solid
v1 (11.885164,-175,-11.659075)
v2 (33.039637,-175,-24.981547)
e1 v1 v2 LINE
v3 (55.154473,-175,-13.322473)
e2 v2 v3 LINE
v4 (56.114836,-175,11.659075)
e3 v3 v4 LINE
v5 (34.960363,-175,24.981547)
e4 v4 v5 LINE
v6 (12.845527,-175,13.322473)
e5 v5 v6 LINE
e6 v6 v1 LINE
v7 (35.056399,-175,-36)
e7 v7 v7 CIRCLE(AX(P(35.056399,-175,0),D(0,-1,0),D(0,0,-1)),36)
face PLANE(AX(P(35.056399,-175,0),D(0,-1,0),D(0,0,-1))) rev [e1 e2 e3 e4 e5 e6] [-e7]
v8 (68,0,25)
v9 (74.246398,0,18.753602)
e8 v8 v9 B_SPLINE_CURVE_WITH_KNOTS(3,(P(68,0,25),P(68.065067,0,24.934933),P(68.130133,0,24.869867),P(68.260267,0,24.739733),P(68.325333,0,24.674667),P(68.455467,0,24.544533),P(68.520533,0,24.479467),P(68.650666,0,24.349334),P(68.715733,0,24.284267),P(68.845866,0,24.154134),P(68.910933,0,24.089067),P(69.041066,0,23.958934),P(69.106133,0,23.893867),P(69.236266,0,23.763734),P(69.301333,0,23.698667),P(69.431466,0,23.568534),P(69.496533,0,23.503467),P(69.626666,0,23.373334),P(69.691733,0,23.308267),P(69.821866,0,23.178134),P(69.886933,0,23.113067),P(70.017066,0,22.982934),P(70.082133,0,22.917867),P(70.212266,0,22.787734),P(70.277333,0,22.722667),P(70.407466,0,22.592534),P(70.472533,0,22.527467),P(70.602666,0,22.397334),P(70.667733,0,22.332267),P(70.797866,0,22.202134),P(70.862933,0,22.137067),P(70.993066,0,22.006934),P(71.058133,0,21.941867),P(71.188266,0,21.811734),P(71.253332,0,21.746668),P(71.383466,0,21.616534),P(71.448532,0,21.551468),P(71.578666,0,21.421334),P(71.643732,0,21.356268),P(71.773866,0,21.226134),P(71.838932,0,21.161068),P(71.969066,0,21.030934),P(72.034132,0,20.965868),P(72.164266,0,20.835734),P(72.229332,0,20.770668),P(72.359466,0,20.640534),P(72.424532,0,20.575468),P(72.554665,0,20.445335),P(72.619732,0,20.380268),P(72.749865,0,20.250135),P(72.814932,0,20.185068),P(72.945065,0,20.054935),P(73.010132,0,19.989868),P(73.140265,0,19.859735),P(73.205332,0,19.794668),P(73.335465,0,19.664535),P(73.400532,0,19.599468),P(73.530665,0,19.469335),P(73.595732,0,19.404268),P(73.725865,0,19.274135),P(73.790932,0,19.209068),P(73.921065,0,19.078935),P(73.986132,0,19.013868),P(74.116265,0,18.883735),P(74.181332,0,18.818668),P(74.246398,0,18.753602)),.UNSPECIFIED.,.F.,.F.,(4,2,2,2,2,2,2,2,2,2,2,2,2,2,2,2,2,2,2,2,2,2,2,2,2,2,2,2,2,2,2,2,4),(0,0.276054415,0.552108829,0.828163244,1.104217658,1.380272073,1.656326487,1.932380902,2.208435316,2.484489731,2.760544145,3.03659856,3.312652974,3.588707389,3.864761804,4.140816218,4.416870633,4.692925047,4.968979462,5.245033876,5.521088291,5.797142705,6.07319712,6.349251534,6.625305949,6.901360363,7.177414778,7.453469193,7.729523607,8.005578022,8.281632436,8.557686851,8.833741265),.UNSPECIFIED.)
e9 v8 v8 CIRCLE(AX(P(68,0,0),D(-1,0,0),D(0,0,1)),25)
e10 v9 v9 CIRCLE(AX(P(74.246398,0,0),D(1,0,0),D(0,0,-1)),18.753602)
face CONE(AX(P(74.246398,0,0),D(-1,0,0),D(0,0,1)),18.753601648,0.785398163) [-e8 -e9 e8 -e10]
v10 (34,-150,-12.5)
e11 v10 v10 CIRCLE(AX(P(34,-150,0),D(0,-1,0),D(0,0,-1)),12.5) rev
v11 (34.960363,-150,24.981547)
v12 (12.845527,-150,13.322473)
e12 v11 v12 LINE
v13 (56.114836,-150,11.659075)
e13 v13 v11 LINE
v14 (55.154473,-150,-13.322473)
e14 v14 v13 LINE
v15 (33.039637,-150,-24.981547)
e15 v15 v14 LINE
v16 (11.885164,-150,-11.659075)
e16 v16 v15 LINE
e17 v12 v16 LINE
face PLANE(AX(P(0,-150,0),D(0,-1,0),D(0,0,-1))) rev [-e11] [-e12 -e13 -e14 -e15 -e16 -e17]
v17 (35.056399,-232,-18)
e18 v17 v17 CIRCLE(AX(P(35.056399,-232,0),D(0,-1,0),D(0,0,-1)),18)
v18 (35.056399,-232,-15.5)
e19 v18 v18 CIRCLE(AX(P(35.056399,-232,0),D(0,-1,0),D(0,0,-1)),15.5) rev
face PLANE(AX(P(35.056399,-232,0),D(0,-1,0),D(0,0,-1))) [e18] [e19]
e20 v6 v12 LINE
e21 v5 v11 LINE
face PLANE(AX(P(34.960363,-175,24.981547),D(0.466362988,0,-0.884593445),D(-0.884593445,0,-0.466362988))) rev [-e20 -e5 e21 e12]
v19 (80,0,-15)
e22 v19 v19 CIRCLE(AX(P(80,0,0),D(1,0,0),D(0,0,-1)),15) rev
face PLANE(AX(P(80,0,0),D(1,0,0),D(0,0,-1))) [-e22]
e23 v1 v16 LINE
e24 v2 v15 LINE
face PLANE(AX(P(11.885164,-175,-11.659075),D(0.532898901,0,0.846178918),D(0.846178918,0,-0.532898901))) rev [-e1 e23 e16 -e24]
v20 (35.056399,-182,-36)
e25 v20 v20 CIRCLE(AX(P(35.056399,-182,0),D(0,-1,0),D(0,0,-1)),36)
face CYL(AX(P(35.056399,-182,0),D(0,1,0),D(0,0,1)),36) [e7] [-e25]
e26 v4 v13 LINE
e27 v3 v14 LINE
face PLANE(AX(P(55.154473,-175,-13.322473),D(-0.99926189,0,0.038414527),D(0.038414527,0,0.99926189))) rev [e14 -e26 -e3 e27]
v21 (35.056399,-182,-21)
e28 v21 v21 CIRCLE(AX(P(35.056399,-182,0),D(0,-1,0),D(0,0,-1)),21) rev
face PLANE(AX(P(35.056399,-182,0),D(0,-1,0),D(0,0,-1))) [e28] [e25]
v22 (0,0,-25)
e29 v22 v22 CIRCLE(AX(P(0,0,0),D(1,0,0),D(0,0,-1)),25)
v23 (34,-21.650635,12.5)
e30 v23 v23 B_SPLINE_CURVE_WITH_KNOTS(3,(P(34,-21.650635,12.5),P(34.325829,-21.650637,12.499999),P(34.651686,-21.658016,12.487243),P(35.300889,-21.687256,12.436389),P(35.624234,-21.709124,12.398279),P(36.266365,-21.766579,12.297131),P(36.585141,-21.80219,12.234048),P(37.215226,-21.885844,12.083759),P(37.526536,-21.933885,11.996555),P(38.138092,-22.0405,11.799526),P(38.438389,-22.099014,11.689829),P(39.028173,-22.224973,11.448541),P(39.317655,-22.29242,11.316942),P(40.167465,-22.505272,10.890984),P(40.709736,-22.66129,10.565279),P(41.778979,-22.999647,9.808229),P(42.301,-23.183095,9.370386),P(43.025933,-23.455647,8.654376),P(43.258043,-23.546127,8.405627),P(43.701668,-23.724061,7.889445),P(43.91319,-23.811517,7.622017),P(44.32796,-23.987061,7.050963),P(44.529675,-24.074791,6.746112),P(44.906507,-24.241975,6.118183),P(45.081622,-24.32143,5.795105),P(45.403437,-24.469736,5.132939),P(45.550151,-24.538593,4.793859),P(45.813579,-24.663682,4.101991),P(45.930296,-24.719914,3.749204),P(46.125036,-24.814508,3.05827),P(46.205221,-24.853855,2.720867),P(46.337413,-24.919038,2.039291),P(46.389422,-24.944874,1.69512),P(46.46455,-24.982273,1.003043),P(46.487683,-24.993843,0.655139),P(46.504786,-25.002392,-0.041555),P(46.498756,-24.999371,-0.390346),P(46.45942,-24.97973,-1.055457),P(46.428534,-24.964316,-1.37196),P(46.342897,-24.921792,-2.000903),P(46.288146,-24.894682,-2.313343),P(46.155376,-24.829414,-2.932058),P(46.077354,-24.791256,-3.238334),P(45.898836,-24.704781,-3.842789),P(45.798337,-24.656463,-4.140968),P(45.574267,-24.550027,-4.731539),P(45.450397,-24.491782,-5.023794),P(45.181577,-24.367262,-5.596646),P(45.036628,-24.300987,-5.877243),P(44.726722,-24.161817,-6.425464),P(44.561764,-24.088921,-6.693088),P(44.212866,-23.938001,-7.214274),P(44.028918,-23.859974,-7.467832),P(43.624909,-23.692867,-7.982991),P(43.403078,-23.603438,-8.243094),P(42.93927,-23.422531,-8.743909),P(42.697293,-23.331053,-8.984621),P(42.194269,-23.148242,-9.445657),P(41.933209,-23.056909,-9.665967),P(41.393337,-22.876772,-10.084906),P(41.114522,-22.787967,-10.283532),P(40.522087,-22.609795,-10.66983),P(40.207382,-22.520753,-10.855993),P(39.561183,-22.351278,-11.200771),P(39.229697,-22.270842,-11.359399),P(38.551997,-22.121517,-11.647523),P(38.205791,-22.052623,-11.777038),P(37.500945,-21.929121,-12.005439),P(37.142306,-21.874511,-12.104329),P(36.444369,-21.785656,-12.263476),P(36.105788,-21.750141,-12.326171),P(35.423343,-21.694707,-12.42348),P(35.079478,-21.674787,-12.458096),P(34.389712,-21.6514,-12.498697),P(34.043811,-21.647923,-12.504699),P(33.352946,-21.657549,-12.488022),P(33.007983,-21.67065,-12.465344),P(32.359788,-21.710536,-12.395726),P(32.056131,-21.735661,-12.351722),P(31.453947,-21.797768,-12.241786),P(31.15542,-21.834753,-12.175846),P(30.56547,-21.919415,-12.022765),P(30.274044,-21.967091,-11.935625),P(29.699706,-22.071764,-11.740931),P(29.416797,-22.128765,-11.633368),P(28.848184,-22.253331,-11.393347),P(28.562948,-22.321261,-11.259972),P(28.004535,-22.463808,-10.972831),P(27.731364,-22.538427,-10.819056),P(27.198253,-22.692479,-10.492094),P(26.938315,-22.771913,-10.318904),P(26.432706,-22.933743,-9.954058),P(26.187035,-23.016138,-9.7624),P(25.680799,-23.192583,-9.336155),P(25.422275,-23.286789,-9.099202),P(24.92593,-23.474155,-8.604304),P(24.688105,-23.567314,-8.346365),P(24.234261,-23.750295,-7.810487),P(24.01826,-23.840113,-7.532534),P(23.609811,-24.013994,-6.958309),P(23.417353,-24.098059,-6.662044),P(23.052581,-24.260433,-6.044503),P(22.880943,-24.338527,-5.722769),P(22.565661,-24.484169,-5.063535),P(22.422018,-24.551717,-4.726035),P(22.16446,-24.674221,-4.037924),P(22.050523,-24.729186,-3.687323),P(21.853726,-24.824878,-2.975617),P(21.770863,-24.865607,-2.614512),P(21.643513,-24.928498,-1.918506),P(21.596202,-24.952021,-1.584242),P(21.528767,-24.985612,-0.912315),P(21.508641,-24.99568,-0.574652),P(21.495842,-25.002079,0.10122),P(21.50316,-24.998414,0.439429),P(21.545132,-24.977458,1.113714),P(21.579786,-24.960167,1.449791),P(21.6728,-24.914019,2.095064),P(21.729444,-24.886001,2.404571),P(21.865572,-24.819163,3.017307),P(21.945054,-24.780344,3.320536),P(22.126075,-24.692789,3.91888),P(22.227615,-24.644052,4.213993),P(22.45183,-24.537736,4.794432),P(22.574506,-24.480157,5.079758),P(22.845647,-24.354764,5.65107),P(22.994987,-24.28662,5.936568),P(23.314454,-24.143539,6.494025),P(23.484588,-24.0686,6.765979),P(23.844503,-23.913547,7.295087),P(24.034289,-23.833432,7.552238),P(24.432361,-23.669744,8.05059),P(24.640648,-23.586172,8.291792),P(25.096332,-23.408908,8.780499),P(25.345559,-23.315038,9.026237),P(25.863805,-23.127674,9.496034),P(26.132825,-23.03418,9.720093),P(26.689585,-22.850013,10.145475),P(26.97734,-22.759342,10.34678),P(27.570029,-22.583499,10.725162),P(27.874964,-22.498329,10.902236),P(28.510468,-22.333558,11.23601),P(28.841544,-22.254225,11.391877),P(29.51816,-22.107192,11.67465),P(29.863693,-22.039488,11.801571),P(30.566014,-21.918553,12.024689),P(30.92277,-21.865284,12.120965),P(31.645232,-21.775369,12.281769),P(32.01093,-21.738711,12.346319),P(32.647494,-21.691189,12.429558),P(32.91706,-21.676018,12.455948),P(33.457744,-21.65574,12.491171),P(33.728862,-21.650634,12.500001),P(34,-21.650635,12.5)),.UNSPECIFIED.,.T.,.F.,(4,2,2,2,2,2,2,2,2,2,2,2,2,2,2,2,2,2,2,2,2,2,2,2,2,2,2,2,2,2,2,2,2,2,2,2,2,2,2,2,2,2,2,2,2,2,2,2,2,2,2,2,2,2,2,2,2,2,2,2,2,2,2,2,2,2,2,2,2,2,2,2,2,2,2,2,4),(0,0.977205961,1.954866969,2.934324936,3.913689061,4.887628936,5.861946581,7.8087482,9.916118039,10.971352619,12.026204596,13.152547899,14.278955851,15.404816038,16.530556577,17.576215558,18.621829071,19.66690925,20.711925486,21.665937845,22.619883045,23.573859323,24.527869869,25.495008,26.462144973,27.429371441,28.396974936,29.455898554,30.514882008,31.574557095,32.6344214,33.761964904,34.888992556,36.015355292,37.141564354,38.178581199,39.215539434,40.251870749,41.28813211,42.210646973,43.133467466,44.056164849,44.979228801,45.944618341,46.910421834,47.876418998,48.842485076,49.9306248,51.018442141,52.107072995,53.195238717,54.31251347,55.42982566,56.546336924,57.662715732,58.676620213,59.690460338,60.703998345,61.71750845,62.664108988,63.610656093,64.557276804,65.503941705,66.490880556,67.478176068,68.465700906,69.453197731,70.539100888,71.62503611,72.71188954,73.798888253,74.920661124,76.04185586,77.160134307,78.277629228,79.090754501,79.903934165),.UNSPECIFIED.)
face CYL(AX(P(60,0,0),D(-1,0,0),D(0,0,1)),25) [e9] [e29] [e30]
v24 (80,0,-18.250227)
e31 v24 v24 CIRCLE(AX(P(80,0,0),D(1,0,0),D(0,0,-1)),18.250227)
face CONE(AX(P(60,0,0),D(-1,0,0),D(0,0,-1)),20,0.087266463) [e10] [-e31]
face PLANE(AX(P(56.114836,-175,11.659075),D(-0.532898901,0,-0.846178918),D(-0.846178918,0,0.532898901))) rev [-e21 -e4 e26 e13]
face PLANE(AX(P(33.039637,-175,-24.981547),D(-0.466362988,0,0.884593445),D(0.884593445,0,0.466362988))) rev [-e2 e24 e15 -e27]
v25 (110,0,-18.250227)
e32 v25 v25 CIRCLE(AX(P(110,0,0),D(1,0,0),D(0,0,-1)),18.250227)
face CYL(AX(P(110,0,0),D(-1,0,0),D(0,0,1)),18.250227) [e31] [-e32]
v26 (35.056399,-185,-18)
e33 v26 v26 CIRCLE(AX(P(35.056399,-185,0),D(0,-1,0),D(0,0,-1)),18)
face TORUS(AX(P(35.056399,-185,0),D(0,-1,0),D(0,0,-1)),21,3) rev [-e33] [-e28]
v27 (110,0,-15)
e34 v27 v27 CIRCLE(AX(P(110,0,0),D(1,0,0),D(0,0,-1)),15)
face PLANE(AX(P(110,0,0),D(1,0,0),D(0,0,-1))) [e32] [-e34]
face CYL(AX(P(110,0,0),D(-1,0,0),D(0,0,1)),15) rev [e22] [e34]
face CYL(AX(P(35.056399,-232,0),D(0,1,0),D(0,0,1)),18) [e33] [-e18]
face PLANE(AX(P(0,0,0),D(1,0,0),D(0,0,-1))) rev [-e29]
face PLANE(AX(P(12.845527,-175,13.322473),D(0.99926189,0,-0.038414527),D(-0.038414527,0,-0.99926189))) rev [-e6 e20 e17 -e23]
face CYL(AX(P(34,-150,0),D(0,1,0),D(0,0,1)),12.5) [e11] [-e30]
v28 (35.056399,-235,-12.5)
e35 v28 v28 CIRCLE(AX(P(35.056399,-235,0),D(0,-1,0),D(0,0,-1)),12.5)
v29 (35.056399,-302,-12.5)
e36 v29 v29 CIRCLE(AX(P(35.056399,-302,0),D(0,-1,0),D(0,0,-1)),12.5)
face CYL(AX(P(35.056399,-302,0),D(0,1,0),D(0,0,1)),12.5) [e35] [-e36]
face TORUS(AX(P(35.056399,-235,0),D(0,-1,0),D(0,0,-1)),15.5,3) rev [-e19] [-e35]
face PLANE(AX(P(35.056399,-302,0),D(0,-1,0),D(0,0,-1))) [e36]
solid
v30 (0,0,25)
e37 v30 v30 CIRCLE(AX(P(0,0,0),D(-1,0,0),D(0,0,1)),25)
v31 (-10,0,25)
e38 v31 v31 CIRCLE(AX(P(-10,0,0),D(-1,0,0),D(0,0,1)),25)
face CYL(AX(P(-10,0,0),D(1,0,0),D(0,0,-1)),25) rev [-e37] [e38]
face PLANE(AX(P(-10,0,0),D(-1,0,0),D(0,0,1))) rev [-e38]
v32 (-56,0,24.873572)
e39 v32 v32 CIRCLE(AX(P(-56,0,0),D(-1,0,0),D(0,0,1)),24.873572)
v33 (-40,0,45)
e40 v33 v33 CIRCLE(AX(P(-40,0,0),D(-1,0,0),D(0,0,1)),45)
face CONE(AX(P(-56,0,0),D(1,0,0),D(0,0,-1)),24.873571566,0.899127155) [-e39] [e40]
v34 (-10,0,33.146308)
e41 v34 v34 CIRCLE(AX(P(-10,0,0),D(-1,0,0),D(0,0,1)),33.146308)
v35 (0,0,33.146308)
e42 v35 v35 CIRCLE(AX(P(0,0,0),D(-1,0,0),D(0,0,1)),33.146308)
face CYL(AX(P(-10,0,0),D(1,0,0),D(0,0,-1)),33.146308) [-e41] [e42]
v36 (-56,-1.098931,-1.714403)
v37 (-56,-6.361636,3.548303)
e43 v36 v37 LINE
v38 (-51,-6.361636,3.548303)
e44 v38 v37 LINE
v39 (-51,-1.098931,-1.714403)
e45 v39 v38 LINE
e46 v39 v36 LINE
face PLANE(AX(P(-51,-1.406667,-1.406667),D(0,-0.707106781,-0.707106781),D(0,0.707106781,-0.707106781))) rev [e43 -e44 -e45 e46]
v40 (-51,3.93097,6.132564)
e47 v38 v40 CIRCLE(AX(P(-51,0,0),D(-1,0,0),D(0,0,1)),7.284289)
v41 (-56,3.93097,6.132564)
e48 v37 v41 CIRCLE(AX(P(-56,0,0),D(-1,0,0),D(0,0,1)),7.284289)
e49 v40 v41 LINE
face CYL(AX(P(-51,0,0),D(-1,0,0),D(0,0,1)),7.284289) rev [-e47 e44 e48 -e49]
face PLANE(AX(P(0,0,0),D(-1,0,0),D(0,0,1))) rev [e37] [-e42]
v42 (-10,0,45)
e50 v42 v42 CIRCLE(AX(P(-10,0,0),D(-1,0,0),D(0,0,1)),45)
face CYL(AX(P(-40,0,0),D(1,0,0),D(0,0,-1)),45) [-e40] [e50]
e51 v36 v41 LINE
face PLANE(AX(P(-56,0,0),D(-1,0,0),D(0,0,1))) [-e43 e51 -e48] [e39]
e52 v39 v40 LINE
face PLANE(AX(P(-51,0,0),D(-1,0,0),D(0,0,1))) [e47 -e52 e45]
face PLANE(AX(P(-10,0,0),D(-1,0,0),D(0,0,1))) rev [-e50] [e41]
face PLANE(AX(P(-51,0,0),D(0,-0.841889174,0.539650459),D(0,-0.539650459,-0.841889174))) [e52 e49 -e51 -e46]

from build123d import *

# Parameters (mm, degrees)
SKETCH1_R            = 25
BOSS_EXTRUDE1_DEPTH  = 60
SKETCH2_R            = 20
BOSS_EXTRUDE3_DEPTH  = 20
BOSS_EXTRUDE3_TAPER  = 5
CHAMFER1_SIZE        = 13
CHAMFER1_SIZE_2      = 14.300817279
SKETCH3_R            = 18.250226729
SKETCH3_R_2          = 15
BOSS_EXTRUDE5_DEPTH  = 30
SKETCH4_R            = 12.5
BOSS_EXTRUDE6_DEPTH  = 150
SKETCH7_R            = 33.146308187
SKETCH7_R_2          = 25
BOSS_EXTRUDE11_DEPTH = 10
SKETCH8_R            = 45
BOSS_EXTRUDE12_DEPTH = 30
CUT_EXTRUDE1_DEPTH   = 5
BOSS_EXTRUDE13_DEPTH = 25
SKETCH14_R           = 36
BOSS_EXTRUDE14_DEPTH = 7
SKETCH15_R           = 18
BOSS_EXTRUDE15_DEPTH = 50
SKETCH16_R           = 12.5
BOSS_EXTRUDE16_DEPTH = 70
FILLET1_R            = 3
FILLET2_R            = 3


# Read off the part's stored shape, not the designer's step: Boundary1
with BuildPart() as part:
    # Sketch1 → Boss-Extrude1 (new body)
    with BuildSketch(Plane(origin=(0, 0, 0), x_dir=(0, 0, -1), z_dir=(1, 0, 0))):
        with Locations(Location((0, 0, 0), (0, 0, 180))):
            Circle(SKETCH1_R)
    extrude(amount=BOSS_EXTRUDE1_DEPTH)

    # Sketch2 → Boss-Extrude3 (add)
    with BuildSketch(Plane(origin=(60, 0, 0), x_dir=(0, 0, -1), z_dir=(1, 0, 0))):
        Circle(SKETCH2_R)
    extrude(amount=BOSS_EXTRUDE3_DEPTH, taper=BOSS_EXTRUDE3_TAPER)

    # Chamfer1
    # the kernel refuses this chamfer: 14.300817279, 13 mm, written as the material it adds along each edge
    with BuildSketch(Plane(origin=(60, 0, 0), x_dir=(0, 0, -1), z_dir=(0, -1, 0))) as chamfer1_piece_1_section:
        Polygon((20 + CHAMFER1_SIZE, 0), (20 - CHAMFER1_SIZE_2 * 0.0871557427485, CHAMFER1_SIZE_2 * 0.996194698102), (20, 0), align=None)
    chamfer1_piece_1 = revolve(axis=Axis((60, 0, 0), (1, 0, 0)), mode=Mode.PRIVATE)
    chamfer1_piece_1 = chamfer1_piece_1 & Plane(origin=(71.177617688, 0, 0), x_dir=(0, 0, 1), z_dir=(-1, 0, 0)) * Cylinder(25, 132, mode=Mode.PRIVATE)
    add(chamfer1_piece_1)

    # Sketch3 → Boss-Extrude5 (add)
    with BuildSketch(Plane(origin=(80, 0, 0), x_dir=(0, 0, -1), z_dir=(1, 0, 0))):
        Circle(SKETCH3_R)
        Circle(SKETCH3_R_2, mode=Mode.SUBTRACT)
    extrude(amount=BOSS_EXTRUDE5_DEPTH)

    # Sketch4 → Boss-Extrude6 (add)
    with BuildSketch(Plane(origin=(0, 0, 0), x_dir=(1, 0, 0), z_dir=(0, 1, 0))):
        with Locations(Location((34, 0, 0), (0, 0, 270))):
            Circle(SKETCH4_R)
    extrude(amount=-BOSS_EXTRUDE6_DEPTH)

    # Sketch13 → Boss-Extrude13 (add)
    with BuildSketch(Plane.XZ.offset(150)):
        Polygon((33.039636823, -24.981547241), (55.154472948, -13.322472529), (56.114836125, 11.659074712), (34.960363177, 24.981547241), (12.845527052, 13.322472529), (11.885163875, -11.659074712), align=None)
    extrude(amount=BOSS_EXTRUDE13_DEPTH)

    # Sketch14 → Boss-Extrude14 (add)
    with BuildSketch(Plane.XZ.offset(175)):
        with Locations(Location((35.056399495, 0, 0), (0, 0, 270))):
            Circle(SKETCH14_R)
    extrude(amount=BOSS_EXTRUDE14_DEPTH)

    # Sketch15 → Boss-Extrude15 (add)
    with BuildSketch(Plane.XZ.offset(182)):
        with Locations(Location((35.056399495, 0, 0), (0, 0, 270))):
            Circle(SKETCH15_R)
    extrude(amount=BOSS_EXTRUDE15_DEPTH)

    # Sketch16 → Boss-Extrude16 (add)
    with BuildSketch(Plane.XZ.offset(232)):
        with Locations(Location((35.056399495, 0, 0), (0, 0, 270))):
            Circle(SKETCH16_R)
    extrude(amount=BOSS_EXTRUDE16_DEPTH)

    # Fillet1
    fillet1_edges = [part.edges().sort_by_distance(p)[0] for p in [
        (35.056399495, -232, 12.5),
    ]]
    fillet(fillet1_edges, radius=FILLET1_R)

    # Fillet2
    fillet2_edges = [part.edges().sort_by_distance(p)[0] for p in [
        (35.056399495, -182, 18),
    ]]
    fillet(fillet2_edges, radius=FILLET2_R)


with BuildPart() as body_2:
    # Sketch7 → Boss-Extrude11 (new body)
    with BuildSketch(Plane.ZY):
        Circle(SKETCH7_R)
        Circle(SKETCH7_R_2, mode=Mode.SUBTRACT)
    extrude(amount=BOSS_EXTRUDE11_DEPTH)

    # Sketch8 → Boss-Extrude12 (add)
    with BuildSketch(Plane.ZY.offset(10)):
        Circle(SKETCH8_R)
    extrude(amount=BOSS_EXTRUDE12_DEPTH)

    # Boundary1 outline → Boundary1 (revolve)
    with BuildSketch(Plane.YX):
        Polygon((0, -56), (24.873571566, -56), (45, -40), (0, -40), align=None)
    revolve(axis=Axis((0, 0, 0), (1, 0, 0)))

    # Sketch11 → Cut-Extrude1 (cut)
    with BuildSketch(Plane.ZY.offset(56)):
        with BuildLine():
            Line((6.132563907, 3.930969814), (-1.714402502, -1.098930983))
            Line((-1.714402502, -1.098930983), (3.548302536, -6.361636021))
            ThreePointArc((3.548302536, -6.361636021), (6.281230942, -3.68876695), (7.28428883, 0))
            ThreePointArc((7.28428883, 0), (6.990430263, 2.048108516), (6.132563907, 3.930969814))
        make_face()
    extrude(amount=-CUT_EXTRUDE1_DEPTH, mode=Mode.SUBTRACT)


solid = Compound([part.part, body_2.part])
